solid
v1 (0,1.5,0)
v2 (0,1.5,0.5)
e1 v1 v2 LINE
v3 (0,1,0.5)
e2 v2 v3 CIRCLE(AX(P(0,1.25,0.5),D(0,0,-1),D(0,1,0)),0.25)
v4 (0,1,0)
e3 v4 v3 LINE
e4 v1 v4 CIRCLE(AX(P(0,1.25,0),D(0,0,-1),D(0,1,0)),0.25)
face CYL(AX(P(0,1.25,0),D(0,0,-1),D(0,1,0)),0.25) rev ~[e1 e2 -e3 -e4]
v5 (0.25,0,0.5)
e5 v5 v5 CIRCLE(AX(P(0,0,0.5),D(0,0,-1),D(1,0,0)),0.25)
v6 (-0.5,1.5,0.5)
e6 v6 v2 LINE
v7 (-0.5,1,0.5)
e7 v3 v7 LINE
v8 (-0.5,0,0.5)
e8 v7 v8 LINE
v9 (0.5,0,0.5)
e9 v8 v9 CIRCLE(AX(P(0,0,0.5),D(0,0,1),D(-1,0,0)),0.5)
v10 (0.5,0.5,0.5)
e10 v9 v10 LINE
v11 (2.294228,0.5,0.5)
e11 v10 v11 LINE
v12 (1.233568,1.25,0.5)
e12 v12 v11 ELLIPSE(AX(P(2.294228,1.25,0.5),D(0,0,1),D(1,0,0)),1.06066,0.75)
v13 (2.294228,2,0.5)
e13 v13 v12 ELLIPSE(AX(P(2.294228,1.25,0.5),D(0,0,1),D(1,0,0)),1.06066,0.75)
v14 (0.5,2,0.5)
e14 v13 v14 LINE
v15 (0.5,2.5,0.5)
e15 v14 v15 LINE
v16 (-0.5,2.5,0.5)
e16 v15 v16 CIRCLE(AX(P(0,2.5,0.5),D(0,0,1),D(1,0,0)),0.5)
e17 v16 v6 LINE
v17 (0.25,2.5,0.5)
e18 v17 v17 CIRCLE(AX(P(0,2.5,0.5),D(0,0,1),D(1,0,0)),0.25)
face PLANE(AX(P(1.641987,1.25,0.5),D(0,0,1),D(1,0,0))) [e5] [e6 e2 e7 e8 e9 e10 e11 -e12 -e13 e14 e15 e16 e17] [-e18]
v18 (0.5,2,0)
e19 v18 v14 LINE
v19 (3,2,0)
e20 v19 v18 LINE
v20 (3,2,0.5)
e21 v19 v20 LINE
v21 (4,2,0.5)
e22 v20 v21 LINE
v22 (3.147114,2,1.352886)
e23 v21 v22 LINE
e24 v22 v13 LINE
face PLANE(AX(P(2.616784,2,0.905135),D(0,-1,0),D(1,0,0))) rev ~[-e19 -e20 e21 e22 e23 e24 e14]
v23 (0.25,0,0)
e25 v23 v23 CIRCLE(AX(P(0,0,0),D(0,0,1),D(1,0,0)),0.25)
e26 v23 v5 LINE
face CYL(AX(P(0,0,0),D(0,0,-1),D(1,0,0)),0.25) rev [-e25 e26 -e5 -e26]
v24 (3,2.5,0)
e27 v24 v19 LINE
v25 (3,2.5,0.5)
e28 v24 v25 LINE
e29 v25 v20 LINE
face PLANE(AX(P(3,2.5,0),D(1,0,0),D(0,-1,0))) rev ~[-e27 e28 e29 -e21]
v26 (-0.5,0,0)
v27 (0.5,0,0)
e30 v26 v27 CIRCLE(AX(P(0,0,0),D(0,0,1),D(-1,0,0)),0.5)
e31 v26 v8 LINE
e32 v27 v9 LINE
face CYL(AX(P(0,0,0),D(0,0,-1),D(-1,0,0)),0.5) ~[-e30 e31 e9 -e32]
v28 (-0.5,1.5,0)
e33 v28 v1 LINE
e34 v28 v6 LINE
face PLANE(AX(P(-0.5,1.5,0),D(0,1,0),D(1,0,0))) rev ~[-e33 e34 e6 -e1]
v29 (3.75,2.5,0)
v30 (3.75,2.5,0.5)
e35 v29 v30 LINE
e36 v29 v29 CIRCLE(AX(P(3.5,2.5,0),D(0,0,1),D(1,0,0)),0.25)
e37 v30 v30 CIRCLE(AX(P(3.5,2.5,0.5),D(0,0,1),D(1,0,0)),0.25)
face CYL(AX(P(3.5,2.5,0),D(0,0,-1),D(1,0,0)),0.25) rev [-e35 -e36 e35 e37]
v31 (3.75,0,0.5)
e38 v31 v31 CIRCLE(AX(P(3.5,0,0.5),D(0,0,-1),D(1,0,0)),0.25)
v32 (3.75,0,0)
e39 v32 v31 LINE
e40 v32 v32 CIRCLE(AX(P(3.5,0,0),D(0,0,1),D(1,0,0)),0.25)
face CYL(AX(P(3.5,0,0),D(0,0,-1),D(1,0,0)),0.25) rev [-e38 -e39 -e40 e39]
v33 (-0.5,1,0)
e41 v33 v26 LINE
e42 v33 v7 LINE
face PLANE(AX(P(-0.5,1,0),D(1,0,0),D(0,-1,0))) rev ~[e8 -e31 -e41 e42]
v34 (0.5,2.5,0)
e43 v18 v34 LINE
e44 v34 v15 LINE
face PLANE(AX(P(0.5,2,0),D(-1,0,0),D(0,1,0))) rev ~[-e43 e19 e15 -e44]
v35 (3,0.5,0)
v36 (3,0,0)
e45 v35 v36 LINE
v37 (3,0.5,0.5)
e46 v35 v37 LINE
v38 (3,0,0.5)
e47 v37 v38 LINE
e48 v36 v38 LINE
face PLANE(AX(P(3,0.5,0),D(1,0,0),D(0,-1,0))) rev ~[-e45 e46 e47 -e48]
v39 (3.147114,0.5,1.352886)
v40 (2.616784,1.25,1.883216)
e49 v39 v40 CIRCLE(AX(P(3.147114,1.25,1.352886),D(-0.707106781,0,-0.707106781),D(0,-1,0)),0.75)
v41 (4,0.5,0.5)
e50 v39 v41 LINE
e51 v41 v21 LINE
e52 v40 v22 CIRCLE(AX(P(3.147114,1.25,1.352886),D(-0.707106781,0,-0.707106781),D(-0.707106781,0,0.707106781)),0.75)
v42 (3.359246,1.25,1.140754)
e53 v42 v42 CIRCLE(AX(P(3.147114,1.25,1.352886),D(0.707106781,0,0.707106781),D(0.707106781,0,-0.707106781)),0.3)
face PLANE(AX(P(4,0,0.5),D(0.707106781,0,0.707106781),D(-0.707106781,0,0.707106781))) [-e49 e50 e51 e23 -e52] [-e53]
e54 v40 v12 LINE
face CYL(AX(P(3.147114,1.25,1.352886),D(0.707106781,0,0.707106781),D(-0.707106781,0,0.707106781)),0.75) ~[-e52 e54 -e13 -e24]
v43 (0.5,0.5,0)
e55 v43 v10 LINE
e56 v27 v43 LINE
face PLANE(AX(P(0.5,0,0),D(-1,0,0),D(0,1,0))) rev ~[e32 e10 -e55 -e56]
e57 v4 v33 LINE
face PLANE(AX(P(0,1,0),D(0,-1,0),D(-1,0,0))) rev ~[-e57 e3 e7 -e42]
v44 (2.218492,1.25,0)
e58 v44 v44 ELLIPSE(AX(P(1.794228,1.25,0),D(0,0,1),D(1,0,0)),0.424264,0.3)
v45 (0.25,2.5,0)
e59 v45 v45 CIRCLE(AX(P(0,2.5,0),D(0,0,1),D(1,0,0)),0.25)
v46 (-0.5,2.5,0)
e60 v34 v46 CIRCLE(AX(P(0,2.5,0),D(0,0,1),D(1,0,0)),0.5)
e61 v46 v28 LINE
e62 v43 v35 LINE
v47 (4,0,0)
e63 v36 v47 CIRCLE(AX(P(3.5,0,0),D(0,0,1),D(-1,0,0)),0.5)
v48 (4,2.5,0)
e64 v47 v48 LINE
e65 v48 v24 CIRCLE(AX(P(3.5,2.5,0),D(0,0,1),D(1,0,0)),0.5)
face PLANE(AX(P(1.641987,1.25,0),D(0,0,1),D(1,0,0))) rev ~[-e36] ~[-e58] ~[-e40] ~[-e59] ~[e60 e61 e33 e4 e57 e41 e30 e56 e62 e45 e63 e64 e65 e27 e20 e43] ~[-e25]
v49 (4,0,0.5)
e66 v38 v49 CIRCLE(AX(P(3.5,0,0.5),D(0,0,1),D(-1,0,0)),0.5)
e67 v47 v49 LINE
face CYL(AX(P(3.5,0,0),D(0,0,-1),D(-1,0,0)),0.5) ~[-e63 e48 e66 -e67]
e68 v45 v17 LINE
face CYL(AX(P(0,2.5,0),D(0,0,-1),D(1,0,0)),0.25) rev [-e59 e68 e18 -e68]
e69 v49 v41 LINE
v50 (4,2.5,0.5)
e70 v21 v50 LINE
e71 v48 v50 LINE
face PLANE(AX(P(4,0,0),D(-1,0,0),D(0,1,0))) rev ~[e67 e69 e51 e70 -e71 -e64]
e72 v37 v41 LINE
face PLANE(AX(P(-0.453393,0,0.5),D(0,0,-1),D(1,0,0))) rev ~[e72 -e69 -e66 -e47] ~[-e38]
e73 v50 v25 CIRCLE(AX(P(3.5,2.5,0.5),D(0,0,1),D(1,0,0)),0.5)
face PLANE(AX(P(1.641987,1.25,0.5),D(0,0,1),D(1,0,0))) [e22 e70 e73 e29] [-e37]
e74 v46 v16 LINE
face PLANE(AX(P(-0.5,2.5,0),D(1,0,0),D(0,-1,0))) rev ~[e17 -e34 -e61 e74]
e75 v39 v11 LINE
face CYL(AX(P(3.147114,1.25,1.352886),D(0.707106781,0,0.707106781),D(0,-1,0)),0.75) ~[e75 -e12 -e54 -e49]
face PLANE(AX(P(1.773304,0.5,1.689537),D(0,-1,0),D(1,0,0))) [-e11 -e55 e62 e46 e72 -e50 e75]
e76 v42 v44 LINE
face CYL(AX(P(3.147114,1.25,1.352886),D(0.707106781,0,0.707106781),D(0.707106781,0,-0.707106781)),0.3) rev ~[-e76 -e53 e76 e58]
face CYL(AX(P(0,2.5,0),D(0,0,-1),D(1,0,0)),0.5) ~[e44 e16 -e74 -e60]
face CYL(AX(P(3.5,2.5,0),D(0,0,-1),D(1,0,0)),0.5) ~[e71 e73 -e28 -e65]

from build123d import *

# Parameters (mm, degrees)
F0_R     = 0.25
F1_DEPTH = 0.5
F3_DEPTH = 2
F4_W     = 4.4533928877
F4_H     = 2.379073936
F5_DEPTH = 0.5
F7_REACH = 4.5971940777
F8_R     = 0.3
F9_DEPTH = 25


with BuildPart() as f1:
    # F0 (on Top) → F1 (new body)
    with BuildSketch(Plane.XY):
        with BuildLine():
            Line((-0.5, 1), (-0.5, 0))
            ThreePointArc((-0.5, 0), (0, -0.5), (0.5, 0))
            Line((0.5, 0), (0.5, 0.5))
            Line((0.5, 0.5), (3, 0.5))
            Line((3, 0.5), (3, 0))
            ThreePointArc((3, 0), (3.5, -0.5), (4, 0))
            Line((4, 0), (4, 2.5))
            ThreePointArc((4, 2.5), (3.5, 3), (3, 2.5))
            Line((3, 2.5), (3, 2))
            Line((3, 2), (0.5, 2))
            Line((0.5, 2), (0.5, 2.5))
            ThreePointArc((0.5, 2.5), (0, 3), (-0.5, 2.5))
            Line((-0.5, 2.5), (-0.5, 1.5))
            Line((-0.5, 1.5), (0, 1.5))
            ThreePointArc((0, 1.5), (0.25, 1.25), (0, 1))
            Line((0, 1), (-0.5, 1))
        make_face()
        Circle(F0_R, mode=Mode.SUBTRACT)
        with Locations((3.5, 0)):
            Circle(F0_R, mode=Mode.SUBTRACT)
        with Locations((0, 2.5)):
            Circle(F0_R, mode=Mode.SUBTRACT)
        with Locations((3.5, 2.5)):
            Circle(F0_R, mode=Mode.SUBTRACT)
    extrude(amount=F1_DEPTH)

    # F2 (on Front) → F3 (join)
    with BuildSketch(Plane.XZ):
        Polygon((2.6167841171, 1.8832158829), (1.2335682341, 0.5), (4, 0.5), align=None)
    extrude(amount=-F3_DEPTH)

    # F4 (on Front) → F5 (cut)
    with BuildSketch(Plane.XZ):
        with Locations((1.7733035561, 1.689536968)):
            Rectangle(F4_W, F4_H)
    extrude(amount=-F5_DEPTH, mode=Mode.SUBTRACT)

    f7_end = Plane(origin=(0.2759630483, 1.25, 0.5), x_dir=(1, 0, 0), z_dir=(0, 0, 1))
    # F6 (on face) → F7 (cut, up to a plane its end follows)
    with BuildSketch(Plane(origin=(2.25, 0, 2.25), x_dir=(0.7071067812, 0, -0.7071067812), z_dir=(0.7071067812, 0, 0.7071067812))):
        with BuildLine():
            ThreePointArc((1.2687110728, 0.5), (0.7383809869, 0.7196699141), (0.5187110728, 1.25))
            Line((0.5187110728, 1.25), (0.5187110728, 0.5))
            Line((0.5187110728, 0.5), (1.2687110728, 0.5))
        make_face()
        with BuildLine():
            ThreePointArc((0.5187110728, 1.25), (0.7383809869, 1.7803300859), (1.2687110728, 2))
            Line((1.2687110728, 2), (0.5187110728, 2))
            Line((0.5187110728, 2), (0.5187110728, 1.25))
        make_face()
    f7_long = extrude(amount=-F7_REACH, mode=Mode.PRIVATE)
    add(split(f7_long, bisect_by=f7_end, keep=Keep.TOP, mode=Mode.PRIVATE), mode=Mode.SUBTRACT)

    # F8 (on face) → F9 (cut)
    with BuildSketch(Plane(origin=(2.25, 0, 2.25), x_dir=(0.7071067812, 0, -0.7071067812), z_dir=(0.7071067812, 0, 0.7071067812))):
        with Locations((1.2687110728, 1.25)):
            Circle(F8_R)
    extrude(amount=-F9_DEPTH, mode=Mode.SUBTRACT)


solid = f1.part
